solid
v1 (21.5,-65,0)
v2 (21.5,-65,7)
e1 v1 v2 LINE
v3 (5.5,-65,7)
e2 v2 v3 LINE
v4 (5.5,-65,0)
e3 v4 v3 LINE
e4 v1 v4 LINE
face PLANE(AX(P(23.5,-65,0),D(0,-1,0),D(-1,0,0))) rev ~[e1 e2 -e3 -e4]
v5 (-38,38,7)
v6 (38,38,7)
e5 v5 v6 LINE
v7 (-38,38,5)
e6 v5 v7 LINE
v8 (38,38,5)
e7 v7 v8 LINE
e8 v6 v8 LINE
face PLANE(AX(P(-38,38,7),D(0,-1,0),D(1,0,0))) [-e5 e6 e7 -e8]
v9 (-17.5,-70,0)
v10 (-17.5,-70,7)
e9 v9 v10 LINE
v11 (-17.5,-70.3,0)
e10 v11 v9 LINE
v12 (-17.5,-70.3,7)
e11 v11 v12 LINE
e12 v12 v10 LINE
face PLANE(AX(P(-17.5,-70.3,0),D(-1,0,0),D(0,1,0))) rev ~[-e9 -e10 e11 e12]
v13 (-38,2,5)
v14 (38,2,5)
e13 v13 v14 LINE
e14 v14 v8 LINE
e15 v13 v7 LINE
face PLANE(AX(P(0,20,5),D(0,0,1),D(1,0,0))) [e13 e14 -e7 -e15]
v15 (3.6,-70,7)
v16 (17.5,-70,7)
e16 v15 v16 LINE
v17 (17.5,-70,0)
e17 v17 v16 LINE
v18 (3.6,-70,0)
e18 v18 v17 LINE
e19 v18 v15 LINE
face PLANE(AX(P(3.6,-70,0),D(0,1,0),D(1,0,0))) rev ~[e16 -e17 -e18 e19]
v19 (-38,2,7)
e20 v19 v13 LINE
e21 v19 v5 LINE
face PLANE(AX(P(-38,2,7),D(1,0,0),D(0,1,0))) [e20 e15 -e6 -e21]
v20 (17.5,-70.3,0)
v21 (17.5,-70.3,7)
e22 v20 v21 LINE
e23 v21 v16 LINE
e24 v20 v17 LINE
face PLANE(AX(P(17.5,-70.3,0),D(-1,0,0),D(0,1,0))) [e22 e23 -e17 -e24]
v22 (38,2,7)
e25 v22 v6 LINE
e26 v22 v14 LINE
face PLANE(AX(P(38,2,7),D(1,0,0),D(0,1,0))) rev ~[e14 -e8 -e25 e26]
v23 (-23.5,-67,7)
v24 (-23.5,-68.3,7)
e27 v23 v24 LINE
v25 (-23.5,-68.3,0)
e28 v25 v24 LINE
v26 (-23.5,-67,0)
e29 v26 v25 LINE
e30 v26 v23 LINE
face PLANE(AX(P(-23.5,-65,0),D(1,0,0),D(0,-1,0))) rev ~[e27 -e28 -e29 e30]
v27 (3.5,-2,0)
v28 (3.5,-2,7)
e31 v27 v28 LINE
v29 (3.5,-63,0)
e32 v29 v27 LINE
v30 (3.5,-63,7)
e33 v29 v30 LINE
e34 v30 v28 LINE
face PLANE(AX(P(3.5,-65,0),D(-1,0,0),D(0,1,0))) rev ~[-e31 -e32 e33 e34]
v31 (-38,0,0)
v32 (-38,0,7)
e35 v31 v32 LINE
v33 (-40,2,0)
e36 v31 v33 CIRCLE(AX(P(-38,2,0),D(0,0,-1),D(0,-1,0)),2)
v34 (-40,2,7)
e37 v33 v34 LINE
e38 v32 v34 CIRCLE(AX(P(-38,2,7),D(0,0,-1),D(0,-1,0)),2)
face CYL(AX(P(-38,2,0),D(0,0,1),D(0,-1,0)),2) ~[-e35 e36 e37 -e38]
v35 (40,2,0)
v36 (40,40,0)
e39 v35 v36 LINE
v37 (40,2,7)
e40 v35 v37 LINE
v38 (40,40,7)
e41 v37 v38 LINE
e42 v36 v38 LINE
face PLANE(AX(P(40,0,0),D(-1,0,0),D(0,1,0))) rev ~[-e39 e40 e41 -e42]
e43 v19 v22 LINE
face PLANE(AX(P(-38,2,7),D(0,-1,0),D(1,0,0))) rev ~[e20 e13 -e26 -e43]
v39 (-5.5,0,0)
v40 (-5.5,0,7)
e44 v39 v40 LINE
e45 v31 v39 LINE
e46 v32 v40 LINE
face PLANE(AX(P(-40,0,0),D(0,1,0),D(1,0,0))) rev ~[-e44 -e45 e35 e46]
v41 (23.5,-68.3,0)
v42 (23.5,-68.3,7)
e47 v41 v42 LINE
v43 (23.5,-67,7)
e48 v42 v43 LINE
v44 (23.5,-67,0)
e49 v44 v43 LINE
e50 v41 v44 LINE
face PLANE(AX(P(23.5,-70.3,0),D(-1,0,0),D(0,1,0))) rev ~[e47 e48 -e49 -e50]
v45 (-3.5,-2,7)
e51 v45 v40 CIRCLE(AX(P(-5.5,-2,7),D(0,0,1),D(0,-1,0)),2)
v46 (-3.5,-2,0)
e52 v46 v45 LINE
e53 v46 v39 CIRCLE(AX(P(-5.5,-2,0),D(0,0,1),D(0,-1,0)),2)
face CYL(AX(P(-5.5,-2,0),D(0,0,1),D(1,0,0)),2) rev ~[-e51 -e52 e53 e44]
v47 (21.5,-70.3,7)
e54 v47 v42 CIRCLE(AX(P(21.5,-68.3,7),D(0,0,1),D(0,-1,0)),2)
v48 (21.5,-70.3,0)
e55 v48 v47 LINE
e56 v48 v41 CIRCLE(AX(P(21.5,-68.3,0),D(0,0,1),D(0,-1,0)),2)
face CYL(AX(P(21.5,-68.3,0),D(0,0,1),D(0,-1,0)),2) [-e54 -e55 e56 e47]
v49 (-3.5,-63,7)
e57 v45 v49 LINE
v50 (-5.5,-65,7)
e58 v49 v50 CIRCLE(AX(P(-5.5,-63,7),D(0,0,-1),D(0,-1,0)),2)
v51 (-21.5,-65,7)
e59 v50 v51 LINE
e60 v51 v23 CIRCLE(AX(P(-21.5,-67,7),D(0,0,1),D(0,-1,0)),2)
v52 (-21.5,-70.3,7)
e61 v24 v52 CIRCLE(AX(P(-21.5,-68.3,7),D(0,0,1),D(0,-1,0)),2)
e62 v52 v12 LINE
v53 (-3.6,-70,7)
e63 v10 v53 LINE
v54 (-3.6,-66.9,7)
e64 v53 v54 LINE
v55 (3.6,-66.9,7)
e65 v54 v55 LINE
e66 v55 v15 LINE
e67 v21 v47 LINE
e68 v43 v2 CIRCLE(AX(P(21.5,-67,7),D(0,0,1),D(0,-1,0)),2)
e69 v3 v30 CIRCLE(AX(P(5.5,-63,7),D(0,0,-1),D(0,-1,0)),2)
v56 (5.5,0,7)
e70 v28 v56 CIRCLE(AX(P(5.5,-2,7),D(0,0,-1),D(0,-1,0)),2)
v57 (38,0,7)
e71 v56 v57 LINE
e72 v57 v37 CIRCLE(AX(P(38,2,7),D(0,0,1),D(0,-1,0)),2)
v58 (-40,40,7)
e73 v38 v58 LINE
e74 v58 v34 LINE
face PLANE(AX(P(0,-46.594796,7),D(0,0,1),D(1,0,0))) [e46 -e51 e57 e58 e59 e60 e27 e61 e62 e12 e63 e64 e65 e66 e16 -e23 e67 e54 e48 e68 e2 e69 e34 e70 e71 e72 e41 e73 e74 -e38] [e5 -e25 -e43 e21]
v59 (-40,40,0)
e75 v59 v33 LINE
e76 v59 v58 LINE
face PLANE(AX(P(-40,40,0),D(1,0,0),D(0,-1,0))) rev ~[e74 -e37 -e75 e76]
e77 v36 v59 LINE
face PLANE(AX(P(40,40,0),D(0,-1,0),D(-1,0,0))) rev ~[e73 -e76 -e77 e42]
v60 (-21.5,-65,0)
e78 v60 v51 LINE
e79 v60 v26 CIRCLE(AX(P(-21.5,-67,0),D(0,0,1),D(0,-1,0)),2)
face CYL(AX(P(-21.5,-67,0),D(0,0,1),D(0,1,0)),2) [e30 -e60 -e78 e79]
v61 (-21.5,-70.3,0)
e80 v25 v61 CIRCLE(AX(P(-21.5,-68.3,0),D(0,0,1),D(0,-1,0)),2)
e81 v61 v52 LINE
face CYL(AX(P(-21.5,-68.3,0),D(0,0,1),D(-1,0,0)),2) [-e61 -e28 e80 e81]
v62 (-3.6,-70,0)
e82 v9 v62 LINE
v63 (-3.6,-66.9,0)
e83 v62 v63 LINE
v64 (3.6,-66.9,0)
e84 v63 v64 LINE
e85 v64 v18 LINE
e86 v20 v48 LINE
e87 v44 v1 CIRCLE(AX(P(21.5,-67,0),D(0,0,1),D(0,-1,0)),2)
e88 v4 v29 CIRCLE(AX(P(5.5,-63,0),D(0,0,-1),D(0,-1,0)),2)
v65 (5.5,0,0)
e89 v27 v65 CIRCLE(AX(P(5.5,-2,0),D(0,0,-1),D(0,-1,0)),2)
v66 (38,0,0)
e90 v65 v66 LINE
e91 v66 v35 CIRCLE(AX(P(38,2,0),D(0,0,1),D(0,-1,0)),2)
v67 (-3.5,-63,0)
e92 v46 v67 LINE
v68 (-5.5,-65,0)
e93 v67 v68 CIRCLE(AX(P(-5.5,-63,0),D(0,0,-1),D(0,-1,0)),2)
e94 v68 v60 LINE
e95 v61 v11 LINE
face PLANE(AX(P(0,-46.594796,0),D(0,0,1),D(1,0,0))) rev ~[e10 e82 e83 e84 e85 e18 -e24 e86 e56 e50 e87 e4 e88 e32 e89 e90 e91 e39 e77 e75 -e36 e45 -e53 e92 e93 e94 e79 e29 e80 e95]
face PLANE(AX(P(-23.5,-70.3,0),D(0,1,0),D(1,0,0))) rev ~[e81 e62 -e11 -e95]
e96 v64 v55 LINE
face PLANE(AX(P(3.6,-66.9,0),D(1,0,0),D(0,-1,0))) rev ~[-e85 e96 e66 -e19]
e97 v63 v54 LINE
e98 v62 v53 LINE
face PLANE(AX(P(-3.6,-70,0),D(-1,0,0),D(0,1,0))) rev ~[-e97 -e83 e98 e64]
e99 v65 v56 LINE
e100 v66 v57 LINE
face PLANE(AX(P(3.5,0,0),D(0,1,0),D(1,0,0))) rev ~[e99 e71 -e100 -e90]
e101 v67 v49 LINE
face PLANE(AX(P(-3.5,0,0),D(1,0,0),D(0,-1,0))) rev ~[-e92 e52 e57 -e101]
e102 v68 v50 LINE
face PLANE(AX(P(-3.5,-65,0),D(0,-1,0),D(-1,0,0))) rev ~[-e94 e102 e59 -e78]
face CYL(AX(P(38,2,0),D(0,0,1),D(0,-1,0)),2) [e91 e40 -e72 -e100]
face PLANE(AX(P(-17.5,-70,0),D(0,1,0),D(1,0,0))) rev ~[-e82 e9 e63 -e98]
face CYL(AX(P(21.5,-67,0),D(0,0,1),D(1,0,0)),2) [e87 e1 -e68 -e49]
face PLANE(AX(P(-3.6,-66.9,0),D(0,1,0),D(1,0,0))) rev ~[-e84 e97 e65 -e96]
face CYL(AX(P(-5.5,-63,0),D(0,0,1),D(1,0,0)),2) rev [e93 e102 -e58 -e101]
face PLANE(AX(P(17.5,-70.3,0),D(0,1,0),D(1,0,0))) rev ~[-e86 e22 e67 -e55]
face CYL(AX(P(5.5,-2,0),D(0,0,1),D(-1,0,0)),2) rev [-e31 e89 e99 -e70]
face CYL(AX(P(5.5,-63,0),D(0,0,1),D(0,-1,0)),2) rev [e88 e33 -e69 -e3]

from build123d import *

# Parameters (mm, degrees)
F0_W     = 6
F0_H     = 0.3
F1_DEPTH = 7
F2_W     = 76
F2_H     = 36
F3_DEPTH = 2
F4_R     = 2


# Not quite as in the source:
# - a feature names something its author has since deleted; it is built from what else it names


with BuildPart() as f1:
    # F0 (on Top) → F1 (new body)
    with BuildSketch(Plane.XY):
        Polygon((3.5, 0), (-3.5, 0), (-3.5, -65), (-23.5, -65), (-23.5, -70), (-17.5, -70), (-3.6, -70), (-3.6, -66.9), (3.6, -66.9), (3.6, -70), (17.5, -70), (23.5, -70), (23.5, -65), (3.5, -65), align=None)
        with Locations((-20.5, -70.15)):
            Rectangle(F0_W, F0_H)
        with Locations((20.5, -70.15)):
            Rectangle(F0_W, F0_H)
        Polygon((-40, 40), (-40, 0), (-3.5, 0), (3.5, 0), (40, 0), (40, 40), align=None)
    extrude(amount=F1_DEPTH)

    # F2 (on face) → F3 (cut)
    with BuildSketch(Plane.XY.offset(7)):
        with Locations((0, 20)):
            Rectangle(F2_W, F2_H)
    extrude(amount=-F3_DEPTH, mode=Mode.SUBTRACT)

    # F4
    f4_edges = [f1.edges().sort_by_distance(p)[0] for p in [
        (-3.5, 0, 3.5),
        (3.5, 0, 3.5),
        (3.5, -65, 3.5),
        (-3.5, -65, 3.5),
        (-23.5, -65, 3.5),
        (23.5, -65, 3.5),
        (-23.5, -70.3, 3.5),
        (23.5, -70.3, 3.5),
        (40, 0, 3.5),
        (-40, 0, 3.5),
    ]]
    fillet(f4_edges, radius=F4_R)


solid = f1.part
